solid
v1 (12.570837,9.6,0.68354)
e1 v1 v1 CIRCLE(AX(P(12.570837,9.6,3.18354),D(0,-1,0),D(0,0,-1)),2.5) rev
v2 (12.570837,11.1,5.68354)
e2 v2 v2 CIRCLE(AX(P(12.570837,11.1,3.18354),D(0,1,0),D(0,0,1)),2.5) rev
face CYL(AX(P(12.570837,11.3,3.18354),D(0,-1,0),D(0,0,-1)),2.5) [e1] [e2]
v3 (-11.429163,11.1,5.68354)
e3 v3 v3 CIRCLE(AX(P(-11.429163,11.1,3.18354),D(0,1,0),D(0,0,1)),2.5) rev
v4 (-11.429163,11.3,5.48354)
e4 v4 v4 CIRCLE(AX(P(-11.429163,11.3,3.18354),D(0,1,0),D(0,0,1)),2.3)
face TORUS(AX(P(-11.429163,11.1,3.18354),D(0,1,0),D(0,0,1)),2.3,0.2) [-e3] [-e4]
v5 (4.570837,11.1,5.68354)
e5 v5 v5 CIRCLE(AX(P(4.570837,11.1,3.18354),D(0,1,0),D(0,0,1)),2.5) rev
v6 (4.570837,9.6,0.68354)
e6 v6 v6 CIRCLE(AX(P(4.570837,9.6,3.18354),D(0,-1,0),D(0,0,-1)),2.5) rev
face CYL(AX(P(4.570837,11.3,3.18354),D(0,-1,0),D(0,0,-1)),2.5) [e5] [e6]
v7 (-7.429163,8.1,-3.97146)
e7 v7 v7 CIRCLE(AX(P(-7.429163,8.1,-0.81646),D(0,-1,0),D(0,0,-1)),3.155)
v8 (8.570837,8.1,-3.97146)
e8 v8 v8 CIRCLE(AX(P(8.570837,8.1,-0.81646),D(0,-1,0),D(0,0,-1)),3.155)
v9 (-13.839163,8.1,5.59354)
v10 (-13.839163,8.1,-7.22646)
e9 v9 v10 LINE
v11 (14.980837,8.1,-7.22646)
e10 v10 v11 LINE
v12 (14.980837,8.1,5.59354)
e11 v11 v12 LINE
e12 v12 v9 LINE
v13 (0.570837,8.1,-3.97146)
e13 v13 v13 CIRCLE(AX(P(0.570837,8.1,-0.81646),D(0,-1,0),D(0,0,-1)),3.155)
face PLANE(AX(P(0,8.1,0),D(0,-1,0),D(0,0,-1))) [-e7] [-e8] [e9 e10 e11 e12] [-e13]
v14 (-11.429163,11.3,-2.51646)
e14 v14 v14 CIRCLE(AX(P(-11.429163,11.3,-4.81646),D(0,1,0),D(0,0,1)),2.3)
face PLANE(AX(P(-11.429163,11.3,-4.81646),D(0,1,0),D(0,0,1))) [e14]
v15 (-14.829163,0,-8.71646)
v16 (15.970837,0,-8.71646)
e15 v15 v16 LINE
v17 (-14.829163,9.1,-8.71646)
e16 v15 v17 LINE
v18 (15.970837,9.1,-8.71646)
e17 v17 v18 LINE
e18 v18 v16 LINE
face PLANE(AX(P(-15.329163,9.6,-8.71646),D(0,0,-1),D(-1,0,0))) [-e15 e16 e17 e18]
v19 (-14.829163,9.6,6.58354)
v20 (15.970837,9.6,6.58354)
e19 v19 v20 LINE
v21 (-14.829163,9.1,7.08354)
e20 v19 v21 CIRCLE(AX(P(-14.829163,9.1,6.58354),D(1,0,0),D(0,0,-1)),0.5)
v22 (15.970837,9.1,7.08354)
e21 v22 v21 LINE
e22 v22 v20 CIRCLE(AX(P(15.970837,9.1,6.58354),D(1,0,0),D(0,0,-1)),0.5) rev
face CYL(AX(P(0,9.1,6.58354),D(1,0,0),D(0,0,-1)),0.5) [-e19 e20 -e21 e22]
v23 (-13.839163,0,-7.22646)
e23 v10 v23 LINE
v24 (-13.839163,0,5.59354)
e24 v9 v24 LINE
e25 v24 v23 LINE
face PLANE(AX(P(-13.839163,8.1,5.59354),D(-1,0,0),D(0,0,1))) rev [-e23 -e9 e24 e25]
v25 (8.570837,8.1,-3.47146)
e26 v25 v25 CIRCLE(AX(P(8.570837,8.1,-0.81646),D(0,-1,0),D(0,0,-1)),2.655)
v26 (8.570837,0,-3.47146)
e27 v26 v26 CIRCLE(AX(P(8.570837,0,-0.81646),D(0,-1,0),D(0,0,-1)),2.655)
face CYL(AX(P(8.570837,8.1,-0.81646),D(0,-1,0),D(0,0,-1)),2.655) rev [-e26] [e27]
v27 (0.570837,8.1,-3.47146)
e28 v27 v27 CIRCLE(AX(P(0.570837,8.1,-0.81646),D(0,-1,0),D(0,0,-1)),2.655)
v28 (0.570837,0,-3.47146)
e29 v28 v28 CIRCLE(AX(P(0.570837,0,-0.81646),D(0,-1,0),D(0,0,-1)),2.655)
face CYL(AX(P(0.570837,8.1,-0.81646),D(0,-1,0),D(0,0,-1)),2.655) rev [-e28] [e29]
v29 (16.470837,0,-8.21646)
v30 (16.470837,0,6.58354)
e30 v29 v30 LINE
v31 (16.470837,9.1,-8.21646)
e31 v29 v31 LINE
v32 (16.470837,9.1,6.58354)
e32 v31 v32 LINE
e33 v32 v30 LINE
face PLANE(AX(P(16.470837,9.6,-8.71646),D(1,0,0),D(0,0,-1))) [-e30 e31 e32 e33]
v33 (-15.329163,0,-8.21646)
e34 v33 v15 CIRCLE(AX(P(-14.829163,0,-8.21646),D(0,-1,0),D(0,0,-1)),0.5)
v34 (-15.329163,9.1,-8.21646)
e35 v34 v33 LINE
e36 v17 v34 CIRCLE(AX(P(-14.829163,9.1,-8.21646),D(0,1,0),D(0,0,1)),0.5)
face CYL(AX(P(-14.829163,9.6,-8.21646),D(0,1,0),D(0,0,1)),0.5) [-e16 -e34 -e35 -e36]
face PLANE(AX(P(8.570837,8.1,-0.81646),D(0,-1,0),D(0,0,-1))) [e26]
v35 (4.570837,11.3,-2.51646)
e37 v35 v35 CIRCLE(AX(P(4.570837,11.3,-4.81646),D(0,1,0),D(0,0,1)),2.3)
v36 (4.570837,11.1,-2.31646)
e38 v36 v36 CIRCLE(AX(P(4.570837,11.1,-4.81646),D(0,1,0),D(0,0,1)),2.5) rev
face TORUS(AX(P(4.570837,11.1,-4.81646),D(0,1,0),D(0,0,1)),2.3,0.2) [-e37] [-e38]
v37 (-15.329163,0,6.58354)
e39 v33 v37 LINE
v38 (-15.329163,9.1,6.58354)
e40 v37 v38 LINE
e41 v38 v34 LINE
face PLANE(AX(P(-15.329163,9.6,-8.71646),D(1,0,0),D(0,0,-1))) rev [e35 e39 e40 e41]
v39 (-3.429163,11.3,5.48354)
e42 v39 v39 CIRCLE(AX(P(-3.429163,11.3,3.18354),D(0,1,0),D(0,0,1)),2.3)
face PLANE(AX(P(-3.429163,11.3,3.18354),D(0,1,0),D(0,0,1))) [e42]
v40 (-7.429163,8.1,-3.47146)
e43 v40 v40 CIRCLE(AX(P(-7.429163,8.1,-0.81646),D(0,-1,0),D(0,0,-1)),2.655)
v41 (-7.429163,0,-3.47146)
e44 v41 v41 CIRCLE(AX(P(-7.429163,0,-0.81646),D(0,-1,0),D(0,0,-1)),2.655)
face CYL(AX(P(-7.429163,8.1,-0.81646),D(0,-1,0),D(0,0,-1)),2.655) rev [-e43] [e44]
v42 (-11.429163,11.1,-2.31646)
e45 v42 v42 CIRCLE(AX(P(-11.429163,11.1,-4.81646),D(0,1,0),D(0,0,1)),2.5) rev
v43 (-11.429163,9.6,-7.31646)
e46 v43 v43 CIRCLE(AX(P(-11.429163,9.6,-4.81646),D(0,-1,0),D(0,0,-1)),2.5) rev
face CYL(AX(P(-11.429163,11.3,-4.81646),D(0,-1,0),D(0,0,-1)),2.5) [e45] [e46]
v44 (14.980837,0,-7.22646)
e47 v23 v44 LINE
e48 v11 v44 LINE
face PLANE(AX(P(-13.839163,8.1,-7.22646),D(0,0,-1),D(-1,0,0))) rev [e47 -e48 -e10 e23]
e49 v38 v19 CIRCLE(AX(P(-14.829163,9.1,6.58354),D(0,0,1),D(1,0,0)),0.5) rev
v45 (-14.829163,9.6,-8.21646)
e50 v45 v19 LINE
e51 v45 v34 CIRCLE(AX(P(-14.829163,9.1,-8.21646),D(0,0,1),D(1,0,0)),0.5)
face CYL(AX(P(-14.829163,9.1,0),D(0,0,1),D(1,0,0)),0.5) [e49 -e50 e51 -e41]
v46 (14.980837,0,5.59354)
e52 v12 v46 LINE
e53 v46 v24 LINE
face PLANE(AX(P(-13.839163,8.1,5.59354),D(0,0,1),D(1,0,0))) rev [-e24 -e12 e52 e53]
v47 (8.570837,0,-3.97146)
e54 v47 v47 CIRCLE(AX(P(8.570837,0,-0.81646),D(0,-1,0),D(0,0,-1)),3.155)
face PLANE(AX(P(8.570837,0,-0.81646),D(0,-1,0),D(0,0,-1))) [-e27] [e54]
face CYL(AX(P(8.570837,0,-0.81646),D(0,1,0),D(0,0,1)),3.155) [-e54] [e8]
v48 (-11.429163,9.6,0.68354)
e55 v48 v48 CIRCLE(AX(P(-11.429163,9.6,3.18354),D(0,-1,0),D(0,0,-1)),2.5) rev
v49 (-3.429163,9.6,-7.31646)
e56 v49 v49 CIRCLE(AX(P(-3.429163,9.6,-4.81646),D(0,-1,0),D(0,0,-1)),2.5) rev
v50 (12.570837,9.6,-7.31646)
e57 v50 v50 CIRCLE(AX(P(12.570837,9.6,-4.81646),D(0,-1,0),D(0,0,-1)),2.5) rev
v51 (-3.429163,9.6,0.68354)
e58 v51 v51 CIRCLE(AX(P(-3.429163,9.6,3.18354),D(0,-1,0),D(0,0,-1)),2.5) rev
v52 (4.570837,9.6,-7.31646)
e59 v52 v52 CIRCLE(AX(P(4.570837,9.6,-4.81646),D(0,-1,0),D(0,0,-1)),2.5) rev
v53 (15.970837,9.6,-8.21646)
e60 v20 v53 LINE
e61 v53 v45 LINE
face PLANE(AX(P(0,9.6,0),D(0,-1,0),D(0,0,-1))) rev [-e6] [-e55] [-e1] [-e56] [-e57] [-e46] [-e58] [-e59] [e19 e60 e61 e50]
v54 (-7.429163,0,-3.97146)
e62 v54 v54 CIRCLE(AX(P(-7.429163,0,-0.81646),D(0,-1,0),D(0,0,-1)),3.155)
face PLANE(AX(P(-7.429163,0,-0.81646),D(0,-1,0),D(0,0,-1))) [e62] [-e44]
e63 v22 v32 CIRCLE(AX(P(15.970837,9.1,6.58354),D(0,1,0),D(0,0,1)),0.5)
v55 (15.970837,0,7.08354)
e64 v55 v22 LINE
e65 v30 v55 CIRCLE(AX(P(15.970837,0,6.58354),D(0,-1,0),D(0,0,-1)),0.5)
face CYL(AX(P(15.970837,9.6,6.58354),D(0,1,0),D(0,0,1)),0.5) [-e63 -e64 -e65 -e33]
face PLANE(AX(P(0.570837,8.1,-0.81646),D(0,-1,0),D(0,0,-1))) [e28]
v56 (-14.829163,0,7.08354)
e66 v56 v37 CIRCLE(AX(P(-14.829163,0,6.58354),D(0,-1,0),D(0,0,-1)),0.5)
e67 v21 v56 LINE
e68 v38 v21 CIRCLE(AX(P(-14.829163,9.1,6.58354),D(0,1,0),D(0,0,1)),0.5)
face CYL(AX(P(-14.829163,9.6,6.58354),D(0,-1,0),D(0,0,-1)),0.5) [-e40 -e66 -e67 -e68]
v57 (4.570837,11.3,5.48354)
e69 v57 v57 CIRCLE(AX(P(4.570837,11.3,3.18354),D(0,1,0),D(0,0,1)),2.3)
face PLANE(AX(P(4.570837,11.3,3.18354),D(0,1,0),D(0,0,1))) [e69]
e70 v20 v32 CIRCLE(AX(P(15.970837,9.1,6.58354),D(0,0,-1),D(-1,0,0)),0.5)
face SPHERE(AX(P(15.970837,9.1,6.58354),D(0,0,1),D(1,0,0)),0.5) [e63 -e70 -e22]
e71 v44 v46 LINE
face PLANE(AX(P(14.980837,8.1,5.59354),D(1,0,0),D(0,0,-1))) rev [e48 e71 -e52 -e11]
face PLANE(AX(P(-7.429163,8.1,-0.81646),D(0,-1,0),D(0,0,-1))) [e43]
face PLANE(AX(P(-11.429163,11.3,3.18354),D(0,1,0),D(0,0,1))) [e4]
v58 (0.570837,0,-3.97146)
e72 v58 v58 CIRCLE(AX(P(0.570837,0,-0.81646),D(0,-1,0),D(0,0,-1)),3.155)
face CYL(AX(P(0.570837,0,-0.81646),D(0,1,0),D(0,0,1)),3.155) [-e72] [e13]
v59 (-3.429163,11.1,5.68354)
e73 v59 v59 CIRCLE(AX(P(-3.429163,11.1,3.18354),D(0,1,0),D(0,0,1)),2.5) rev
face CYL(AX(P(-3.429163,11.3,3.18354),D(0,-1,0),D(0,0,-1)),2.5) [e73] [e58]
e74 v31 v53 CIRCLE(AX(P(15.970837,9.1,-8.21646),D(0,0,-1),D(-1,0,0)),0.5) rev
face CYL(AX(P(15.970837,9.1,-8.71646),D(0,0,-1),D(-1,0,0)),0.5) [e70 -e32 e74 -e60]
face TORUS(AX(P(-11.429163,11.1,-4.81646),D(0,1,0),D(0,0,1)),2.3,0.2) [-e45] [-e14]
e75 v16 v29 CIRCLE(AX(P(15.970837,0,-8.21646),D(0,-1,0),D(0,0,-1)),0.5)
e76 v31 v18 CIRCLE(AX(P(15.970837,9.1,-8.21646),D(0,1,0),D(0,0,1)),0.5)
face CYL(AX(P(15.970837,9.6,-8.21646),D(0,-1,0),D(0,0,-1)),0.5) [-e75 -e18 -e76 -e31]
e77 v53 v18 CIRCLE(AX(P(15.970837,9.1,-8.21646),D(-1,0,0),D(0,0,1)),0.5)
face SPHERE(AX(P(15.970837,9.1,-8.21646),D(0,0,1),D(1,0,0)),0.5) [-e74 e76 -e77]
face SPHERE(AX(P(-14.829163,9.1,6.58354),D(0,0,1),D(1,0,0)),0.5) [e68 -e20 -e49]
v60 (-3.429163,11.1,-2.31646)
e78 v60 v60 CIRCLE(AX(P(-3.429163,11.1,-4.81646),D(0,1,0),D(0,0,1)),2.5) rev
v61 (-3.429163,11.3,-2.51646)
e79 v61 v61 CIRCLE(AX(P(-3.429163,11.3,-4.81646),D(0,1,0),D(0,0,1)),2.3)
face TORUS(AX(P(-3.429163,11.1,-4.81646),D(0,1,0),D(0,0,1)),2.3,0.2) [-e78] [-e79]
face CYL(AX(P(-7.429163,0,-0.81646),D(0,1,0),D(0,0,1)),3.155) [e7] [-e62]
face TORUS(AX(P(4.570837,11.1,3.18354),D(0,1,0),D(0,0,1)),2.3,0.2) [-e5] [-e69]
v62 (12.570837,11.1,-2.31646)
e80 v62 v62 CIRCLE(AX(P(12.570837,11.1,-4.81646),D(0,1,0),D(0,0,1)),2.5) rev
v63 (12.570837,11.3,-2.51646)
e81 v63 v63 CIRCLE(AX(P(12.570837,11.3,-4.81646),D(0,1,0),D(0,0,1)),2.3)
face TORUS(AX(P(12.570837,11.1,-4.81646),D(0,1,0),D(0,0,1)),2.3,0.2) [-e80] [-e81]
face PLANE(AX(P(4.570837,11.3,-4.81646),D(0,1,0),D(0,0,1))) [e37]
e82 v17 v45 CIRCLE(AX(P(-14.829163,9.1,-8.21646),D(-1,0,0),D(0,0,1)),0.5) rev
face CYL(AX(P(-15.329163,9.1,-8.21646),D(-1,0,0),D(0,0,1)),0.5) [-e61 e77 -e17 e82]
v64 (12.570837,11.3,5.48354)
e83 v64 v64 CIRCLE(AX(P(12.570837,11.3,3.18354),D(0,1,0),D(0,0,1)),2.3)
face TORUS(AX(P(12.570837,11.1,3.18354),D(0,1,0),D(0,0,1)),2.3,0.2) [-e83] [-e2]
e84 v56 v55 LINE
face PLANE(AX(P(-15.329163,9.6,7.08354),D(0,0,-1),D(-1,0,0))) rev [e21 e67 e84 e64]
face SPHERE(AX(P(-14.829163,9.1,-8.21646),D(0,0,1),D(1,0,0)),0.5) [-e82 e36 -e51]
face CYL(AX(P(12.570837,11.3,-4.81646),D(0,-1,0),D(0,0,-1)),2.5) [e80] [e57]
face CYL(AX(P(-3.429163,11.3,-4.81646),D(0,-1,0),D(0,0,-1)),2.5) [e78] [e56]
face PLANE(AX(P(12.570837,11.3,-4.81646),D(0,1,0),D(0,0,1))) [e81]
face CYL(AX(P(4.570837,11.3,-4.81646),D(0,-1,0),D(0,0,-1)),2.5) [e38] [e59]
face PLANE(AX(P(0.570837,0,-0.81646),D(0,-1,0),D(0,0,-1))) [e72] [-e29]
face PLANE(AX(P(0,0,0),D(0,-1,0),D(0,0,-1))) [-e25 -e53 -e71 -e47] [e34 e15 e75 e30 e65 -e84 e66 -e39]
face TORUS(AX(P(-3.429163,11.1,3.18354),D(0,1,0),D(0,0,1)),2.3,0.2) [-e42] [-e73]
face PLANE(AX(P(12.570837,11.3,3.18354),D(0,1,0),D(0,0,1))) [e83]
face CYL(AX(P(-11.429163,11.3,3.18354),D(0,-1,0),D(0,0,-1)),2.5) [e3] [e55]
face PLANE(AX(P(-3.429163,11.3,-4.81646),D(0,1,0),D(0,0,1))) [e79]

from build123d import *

# Parameters (mm, degrees)
SKETCH2_W              = 31.8
SKETCH2_H              = 15.8
BOSS_EXTRUDE1_DEPTH    = 9.6
FILLET1_R              = 0.5
FILLET3_R              = 0.5
SKETCH4_W              = 28.82
SKETCH4_H              = 12.82
CUT_EXTRUDE1_DEPTH     = 8.1
SKETCH6_R              = 2.5
BOSS_EXTRUDE3_DEPTH    = 1.7
FILLET2_R              = 0.2
LPATTERN3_COUNT        = 4
LPATTERN3_PITCH        = 8
LPATTERN3_COUNT_DIR2   = 2
LPATTERN3_PITCH_DIR2   = 8
FILLET2_OF_LPATTERN3_R = 0.2
SKETCH8_R              = 3.155
BOSS_EXTRUDE4_DEPTH    = 8.1
SKETCH9_R              = 2.655
CUT_EXTRUDE2_DEPTH     = 8.1
LPATTERN4_COUNT        = 3
LPATTERN4_PITCH        = 8


with BuildPart() as part:
    # Sketch2 → Boss-Extrude1 (new body)
    with BuildSketch(Plane(origin=(0, 0, 0), x_dir=(1, 0, 0), z_dir=(0, 1, 0))):
        with Locations((0.57083662, 0.816459546)):
            Rectangle(SKETCH2_W, SKETCH2_H)
    extrude(amount=BOSS_EXTRUDE1_DEPTH)

    # Fillet1
    fillet1_edges = [part.edges().sort_by_distance(p)[0] for p in [
        (0.57083662, 9.6, -8.716459546),
        (-15.32916338, 9.6, -0.816459546),
        (0.57083662, 9.6, 7.083540454),
        (16.47083662, 9.6, -0.816459546),
    ]]
    fillet(fillet1_edges, radius=FILLET1_R)

    # Fillet3
    # the kernel refuses this fillet: 0.5 mm, written as the material it takes off along each edge
    with BuildSketch(Plane(origin=(-14.82916338, 9.1, -8.216459546), x_dir=(-1, 0, 0), z_dir=(0, 0, -1))) as fillet3_piece_1_section:
        Polygon((0, 0), (FILLET3_R, 0), (FILLET3_R, FILLET3_R), (0, FILLET3_R), align=None)
    fillet3_piece_1 = extrude(amount=FILLET3_R, mode=Mode.PRIVATE)
    fillet3_piece_1 = fillet3_piece_1 - Plane(origin=(-14.82916338, 9.1, -8.216459546), x_dir=(0.7071067811865475, -0.7071067811865475, 0), z_dir=(0, 0, -1)) * Sphere(FILLET3_R, mode=Mode.PRIVATE)
    add(fillet3_piece_1, mode=Mode.SUBTRACT)
    with BuildSketch(Plane(origin=(-14.82916338, 9.1, 6.583540454), x_dir=(0, 0, 1), z_dir=(-1, 0, 0))) as fillet3_piece_2_section:
        Polygon((0, 0), (FILLET3_R, 0), (FILLET3_R, FILLET3_R), (0, FILLET3_R), align=None)
    fillet3_piece_2 = extrude(amount=FILLET3_R, mode=Mode.PRIVATE)
    fillet3_piece_2 = fillet3_piece_2 - Plane(origin=(-14.82916338, 9.1, 6.583540454), x_dir=(0, -0.7071067811865475, -0.7071067811865475), z_dir=(-1, 0, 0)) * Sphere(FILLET3_R, mode=Mode.PRIVATE)
    add(fillet3_piece_2, mode=Mode.SUBTRACT)
    with BuildSketch(Plane(origin=(15.97083662, 9.1, -8.216459546), x_dir=(1, 0, 0), z_dir=(0, 0, -1))) as fillet3_piece_3_section:
        Polygon((0, 0), (FILLET3_R, 0), (FILLET3_R, -FILLET3_R), (0, -FILLET3_R), align=None)
    fillet3_piece_3 = extrude(amount=FILLET3_R, mode=Mode.PRIVATE)
    fillet3_piece_3 = fillet3_piece_3 - Plane(origin=(15.97083662, 9.1, -8.216459546), x_dir=(-0.7071067811865475, -0.7071067811865475, 0), z_dir=(0, 0, -1)) * Sphere(FILLET3_R, mode=Mode.PRIVATE)
    add(fillet3_piece_3, mode=Mode.SUBTRACT)
    with BuildSketch(Plane(origin=(15.97083662, 9.1, 6.583540454), x_dir=(0, 0, 1), z_dir=(1, 0, 0))) as fillet3_piece_4_section:
        Polygon((0, 0), (FILLET3_R, 0), (FILLET3_R, -FILLET3_R), (0, -FILLET3_R), align=None)
    fillet3_piece_4 = extrude(amount=FILLET3_R, mode=Mode.PRIVATE)
    fillet3_piece_4 = fillet3_piece_4 - Plane(origin=(15.97083662, 9.1, 6.583540454), x_dir=(0, -0.7071067811865475, -0.7071067811865475), z_dir=(1, 0, 0)) * Sphere(FILLET3_R, mode=Mode.PRIVATE)
    add(fillet3_piece_4, mode=Mode.SUBTRACT)
    with BuildSketch(Plane(origin=(16.47083662, -1.25, -8.716459546), x_dir=(-1, 0, 0), z_dir=(0, 1, 0)), Plane(origin=(16.47083662, -1.25, 7.083540454), x_dir=(0, 0, -1), z_dir=(0, 1, 0))) as fillet3_piece_5:
        with BuildLine():
            CenterArc((FILLET3_R, FILLET3_R), FILLET3_R, 180, 90)
            Line((0, FILLET3_R), (0, 0))
            Line((0, 0), (FILLET3_R, 0))
        make_face()
    extrude(amount=10.35, mode=Mode.SUBTRACT)
    with BuildSketch(Plane(origin=(-15.32916338, -1.25, 7.083540454), x_dir=(0, 0, -1), z_dir=(0, 1, 0)), Plane(origin=(-15.32916338, -1.25, -8.716459546), x_dir=(1, 0, 0), z_dir=(0, 1, 0))) as fillet3_piece_6:
        with BuildLine():
            CenterArc((FILLET3_R, -FILLET3_R), FILLET3_R, 90, 90)
            Line((0, -FILLET3_R), (0, 0))
            Line((0, 0), (FILLET3_R, 0))
        make_face()
    extrude(amount=10.35, mode=Mode.SUBTRACT)

    # Sketch4 → Cut-Extrude1 (cut)
    with BuildSketch(Plane.XZ):
        with Locations((0.57083662, -0.816459546)):
            Rectangle(SKETCH4_W, SKETCH4_H)
    extrude(amount=-CUT_EXTRUDE1_DEPTH, mode=Mode.SUBTRACT)

    # Sketch6 → Boss-Extrude3 (add)
    with BuildSketch(Plane(origin=(0, 9.6, 0), x_dir=(1, 0, 0), z_dir=(0, 1, 0))):
        with Locations(Location((-11.42916338, 4.816459546, 0), (0, 0, 90))):
            Circle(SKETCH6_R)
    boss_extrude3 = extrude(amount=BOSS_EXTRUDE3_DEPTH)

    # Fillet2
    fillet2_edges = [part.edges().sort_by_distance(p)[0] for p in [
        (-11.42916338, 11.3, -2.316459546),
    ]]
    fillet(fillet2_edges, radius=FILLET2_R)

    # LPattern3: Boss-Extrude3 4 × 2
    with Locations(*[(i * LPATTERN3_PITCH, 0, j * LPATTERN3_PITCH_DIR2) for i in range(LPATTERN3_COUNT) for j in range(LPATTERN3_COUNT_DIR2) if (i, j) != (0, 0)]):
        add(boss_extrude3)

    # Fillet2 of LPattern3
    fillet2_of_lpattern3_edges = [part.edges().sort_by_distance(p)[0] for p in [
        (-11.42916338, 11.3, 5.683540454),
        (-3.42916338, 11.3, -2.316459546),
        (-3.42916338, 11.3, 5.683540454),
        (4.57083662, 11.3, -2.316459546),
        (4.57083662, 11.3, 5.683540454),
        (12.57083662, 11.3, -2.316459546),
        (12.57083662, 11.3, 5.683540454),
    ]]
    fillet(fillet2_of_lpattern3_edges, radius=FILLET2_OF_LPATTERN3_R)

    # Sketch8 → Boss-Extrude4 (add)
    with BuildSketch(Plane.XZ.offset(-8.1)):
        with Locations(Location((8.57083662, -0.816459546, 0), (0, 0, 270))):
            Circle(SKETCH8_R)
    boss_extrude4 = extrude(amount=BOSS_EXTRUDE4_DEPTH)

    # Sketch9 → Cut-Extrude2 (cut)
    with BuildSketch(Plane.XZ):
        with Locations(Location((8.57083662, -0.816459546, 0), (0, 0, 270))):
            Circle(SKETCH9_R)
    cut_extrude2 = extrude(amount=-CUT_EXTRUDE2_DEPTH, mode=Mode.SUBTRACT)

    # LPattern4: Boss-Extrude4, Cut-Extrude2 ×3
    with Locations(*[(-i * LPATTERN4_PITCH, 0, 0) for i in range(1, LPATTERN4_COUNT)]):
        add(boss_extrude4)
        add(cut_extrude2, mode=Mode.SUBTRACT)


solid = part.part
